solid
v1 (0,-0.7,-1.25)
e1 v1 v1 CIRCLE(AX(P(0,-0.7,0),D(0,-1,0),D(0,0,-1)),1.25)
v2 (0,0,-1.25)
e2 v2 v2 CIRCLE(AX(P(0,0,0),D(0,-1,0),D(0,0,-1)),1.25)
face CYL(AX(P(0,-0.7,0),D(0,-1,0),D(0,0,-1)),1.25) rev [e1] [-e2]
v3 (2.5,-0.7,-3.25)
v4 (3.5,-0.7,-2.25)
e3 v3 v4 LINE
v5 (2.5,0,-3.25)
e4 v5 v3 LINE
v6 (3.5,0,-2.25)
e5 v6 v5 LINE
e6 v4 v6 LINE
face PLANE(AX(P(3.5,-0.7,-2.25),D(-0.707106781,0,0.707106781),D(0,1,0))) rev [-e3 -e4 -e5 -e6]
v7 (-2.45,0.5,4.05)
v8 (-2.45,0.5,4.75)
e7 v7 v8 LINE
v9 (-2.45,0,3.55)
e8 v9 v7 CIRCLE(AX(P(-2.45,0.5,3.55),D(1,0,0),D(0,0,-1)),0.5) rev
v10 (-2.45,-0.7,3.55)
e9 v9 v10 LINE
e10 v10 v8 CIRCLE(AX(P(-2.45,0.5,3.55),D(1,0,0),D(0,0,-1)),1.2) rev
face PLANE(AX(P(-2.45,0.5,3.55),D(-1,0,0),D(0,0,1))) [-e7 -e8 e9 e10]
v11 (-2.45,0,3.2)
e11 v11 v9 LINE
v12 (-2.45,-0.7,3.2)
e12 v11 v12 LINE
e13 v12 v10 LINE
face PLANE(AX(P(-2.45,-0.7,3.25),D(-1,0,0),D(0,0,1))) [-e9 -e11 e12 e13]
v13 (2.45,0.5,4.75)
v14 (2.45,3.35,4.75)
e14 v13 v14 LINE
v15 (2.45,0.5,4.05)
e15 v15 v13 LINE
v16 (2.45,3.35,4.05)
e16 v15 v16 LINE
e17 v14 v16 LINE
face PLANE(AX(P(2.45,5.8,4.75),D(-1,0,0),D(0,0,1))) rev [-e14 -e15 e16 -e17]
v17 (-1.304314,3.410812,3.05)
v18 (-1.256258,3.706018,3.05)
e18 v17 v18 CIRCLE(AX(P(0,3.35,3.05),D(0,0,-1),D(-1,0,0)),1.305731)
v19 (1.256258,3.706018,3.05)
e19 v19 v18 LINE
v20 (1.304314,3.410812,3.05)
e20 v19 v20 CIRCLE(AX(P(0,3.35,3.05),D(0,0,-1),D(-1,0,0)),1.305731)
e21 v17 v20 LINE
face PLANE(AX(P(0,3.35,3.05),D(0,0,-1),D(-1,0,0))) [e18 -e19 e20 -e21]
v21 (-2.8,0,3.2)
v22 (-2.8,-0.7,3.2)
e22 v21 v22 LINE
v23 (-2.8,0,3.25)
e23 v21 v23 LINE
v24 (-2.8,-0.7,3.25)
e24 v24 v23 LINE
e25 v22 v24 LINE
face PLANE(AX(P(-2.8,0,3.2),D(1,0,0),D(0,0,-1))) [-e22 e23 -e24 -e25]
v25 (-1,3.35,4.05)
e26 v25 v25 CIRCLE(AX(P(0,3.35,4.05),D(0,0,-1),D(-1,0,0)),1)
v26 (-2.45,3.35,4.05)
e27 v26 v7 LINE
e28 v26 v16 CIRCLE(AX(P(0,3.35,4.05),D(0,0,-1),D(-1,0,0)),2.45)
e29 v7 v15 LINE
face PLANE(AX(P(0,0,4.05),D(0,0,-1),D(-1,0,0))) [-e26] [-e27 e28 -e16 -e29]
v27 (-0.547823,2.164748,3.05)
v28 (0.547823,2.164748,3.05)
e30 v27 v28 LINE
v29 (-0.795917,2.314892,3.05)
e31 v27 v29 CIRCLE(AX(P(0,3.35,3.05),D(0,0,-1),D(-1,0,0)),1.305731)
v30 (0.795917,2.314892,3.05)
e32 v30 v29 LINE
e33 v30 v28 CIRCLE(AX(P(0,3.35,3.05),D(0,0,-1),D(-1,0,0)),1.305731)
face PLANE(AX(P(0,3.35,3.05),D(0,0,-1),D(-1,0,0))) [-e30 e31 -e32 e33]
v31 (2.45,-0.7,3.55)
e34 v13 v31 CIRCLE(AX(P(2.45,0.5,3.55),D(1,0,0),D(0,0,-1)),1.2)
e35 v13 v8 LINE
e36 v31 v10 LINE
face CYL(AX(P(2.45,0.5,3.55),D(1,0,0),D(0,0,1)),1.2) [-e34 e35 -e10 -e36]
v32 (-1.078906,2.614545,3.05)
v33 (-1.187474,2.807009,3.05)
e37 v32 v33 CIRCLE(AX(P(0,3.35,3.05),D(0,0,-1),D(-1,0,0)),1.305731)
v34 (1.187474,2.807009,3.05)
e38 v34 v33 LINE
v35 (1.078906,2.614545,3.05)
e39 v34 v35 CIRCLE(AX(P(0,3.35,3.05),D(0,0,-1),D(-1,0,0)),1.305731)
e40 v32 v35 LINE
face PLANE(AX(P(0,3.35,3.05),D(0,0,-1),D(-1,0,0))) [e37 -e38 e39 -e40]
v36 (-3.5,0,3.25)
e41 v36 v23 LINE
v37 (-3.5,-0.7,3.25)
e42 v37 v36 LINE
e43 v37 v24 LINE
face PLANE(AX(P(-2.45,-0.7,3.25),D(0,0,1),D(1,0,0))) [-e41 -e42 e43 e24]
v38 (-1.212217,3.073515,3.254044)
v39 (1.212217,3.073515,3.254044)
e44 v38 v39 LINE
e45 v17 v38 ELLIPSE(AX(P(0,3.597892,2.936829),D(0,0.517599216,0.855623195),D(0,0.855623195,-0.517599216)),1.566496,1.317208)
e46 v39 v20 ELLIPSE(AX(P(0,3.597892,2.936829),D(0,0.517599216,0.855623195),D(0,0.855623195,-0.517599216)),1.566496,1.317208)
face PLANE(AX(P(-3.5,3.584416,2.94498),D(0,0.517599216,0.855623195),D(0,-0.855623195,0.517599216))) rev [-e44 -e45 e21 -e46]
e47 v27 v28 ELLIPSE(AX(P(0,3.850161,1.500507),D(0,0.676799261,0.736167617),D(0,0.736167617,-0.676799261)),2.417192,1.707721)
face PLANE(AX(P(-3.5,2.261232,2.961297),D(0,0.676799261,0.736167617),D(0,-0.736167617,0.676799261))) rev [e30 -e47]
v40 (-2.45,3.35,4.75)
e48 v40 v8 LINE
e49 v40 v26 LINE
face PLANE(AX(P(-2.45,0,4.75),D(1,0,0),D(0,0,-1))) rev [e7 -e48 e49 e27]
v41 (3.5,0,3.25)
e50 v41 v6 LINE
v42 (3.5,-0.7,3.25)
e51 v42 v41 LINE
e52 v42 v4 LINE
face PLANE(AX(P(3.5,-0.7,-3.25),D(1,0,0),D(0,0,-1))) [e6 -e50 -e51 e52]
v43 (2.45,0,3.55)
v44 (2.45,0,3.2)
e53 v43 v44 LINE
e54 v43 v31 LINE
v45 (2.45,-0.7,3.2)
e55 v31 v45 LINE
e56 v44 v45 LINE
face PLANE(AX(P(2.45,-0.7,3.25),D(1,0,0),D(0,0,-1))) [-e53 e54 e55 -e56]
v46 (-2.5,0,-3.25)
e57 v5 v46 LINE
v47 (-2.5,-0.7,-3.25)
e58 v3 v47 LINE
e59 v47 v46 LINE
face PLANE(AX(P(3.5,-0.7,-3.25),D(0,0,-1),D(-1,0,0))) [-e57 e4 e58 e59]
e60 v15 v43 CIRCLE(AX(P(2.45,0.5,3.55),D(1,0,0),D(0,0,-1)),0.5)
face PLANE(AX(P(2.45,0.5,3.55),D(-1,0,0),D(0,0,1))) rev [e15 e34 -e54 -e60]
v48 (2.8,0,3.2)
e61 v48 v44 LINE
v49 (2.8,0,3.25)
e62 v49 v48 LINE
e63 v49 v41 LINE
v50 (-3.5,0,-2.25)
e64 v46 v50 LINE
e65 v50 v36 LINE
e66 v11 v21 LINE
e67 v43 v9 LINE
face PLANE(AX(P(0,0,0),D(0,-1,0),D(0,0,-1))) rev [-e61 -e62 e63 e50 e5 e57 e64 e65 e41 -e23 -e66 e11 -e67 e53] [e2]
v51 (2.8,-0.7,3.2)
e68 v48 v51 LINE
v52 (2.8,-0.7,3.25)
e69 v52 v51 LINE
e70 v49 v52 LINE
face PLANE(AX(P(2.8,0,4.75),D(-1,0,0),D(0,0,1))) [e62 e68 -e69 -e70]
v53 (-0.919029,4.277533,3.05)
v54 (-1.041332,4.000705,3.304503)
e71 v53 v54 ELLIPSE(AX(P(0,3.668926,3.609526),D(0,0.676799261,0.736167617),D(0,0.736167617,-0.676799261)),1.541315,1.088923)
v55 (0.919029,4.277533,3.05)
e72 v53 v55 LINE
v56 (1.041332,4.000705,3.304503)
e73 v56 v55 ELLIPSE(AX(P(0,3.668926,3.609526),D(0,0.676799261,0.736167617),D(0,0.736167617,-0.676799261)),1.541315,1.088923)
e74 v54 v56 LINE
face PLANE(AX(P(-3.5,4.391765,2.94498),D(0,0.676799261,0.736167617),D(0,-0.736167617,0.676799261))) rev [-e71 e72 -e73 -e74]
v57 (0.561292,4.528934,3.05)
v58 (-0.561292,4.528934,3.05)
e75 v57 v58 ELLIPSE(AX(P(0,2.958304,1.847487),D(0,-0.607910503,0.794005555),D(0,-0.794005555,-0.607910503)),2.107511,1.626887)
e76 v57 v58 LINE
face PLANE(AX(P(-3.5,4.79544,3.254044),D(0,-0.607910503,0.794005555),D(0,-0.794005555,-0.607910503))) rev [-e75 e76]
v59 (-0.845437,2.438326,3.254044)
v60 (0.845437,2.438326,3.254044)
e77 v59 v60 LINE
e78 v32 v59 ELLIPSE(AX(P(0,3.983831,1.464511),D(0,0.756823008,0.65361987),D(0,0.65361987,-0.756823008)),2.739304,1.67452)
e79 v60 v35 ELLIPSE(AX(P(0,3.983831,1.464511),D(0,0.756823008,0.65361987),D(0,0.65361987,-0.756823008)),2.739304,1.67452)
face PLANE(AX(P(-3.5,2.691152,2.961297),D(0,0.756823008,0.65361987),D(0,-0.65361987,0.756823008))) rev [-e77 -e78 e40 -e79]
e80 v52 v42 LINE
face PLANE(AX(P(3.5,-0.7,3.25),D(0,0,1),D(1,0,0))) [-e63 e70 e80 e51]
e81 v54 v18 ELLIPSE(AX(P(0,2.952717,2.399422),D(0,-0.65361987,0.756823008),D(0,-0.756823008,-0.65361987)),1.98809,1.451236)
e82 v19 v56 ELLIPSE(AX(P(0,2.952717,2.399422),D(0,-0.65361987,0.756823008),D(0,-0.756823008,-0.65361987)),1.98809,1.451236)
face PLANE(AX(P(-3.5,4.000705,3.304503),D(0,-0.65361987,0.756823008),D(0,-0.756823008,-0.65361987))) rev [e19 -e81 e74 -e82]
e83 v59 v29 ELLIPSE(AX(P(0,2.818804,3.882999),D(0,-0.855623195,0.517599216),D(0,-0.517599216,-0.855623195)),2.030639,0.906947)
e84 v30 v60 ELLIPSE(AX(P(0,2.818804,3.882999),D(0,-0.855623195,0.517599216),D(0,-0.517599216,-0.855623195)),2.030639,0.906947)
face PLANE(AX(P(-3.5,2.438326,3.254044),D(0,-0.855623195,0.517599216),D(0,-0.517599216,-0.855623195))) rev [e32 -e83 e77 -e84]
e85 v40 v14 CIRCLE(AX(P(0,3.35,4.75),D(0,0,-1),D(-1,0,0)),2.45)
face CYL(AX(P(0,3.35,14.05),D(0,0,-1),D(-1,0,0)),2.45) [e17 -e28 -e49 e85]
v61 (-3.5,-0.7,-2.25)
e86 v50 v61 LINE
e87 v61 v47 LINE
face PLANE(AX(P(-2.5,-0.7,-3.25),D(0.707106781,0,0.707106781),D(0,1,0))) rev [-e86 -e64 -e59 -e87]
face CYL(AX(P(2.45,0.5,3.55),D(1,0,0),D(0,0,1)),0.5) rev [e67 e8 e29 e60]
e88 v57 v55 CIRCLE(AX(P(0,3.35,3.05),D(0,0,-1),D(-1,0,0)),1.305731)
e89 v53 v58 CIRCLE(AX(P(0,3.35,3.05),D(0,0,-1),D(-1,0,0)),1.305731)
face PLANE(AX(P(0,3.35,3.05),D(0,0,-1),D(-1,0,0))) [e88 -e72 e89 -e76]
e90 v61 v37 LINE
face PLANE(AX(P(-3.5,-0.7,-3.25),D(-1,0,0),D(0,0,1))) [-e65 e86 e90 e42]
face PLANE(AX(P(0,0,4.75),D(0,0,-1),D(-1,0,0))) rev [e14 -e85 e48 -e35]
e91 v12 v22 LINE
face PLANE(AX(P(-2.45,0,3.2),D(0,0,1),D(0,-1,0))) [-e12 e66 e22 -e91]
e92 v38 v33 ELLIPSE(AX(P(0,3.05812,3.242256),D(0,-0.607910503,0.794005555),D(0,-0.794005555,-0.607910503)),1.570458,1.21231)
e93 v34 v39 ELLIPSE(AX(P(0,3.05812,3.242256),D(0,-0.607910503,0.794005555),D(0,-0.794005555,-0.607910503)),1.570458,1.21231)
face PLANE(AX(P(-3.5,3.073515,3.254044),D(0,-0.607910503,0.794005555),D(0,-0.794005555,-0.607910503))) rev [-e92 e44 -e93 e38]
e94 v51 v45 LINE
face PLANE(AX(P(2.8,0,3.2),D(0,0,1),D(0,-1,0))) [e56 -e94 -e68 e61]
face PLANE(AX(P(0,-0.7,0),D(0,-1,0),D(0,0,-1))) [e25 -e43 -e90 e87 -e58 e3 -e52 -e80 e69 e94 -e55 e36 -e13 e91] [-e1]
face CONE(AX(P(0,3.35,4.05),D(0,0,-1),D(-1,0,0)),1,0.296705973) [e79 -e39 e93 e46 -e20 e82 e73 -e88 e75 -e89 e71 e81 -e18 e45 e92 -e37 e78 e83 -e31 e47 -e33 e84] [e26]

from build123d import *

# Parameters (mm, degrees)
BASE_FLANGE1_DEPTH       = 0.7
EDGE_FLANGE1_START       = -2.45
EDGE_FLANGE1_DEPTH       = 4.9
EDGE_FLANGE1_START_2     = -2.8
EDGE_FLANGE1_2_OUTLINE_W = 0.7
EDGE_FLANGE1_2_OUTLINE_H = 0.05
EDGE_FLANGE1_2_DEPTH     = 0.35
EDGE_FLANGE1_START_3     = 2.45
EDGE_FLANGE1_3_OUTLINE_W = 0.7
EDGE_FLANGE1_3_OUTLINE_H = 0.05
EDGE_FLANGE1_3_DEPTH     = 0.35
EDGE_FLANGE1_4_DEPTH     = 4.9
CUT_EXTRUDE1_DEPTH       = 10
SKETCH10_R               = 1
BOSS_EXTRUDE1_DEPTH      = 1
BOSS_EXTRUDE1_DRAFT      = -17
CUT_EXTRUDE2_DEPTH       = 10.571050099
CHAMFER1_SIZE            = 1
M3_TAPPED_HOLE1_D        = 2.5
M3_TAPPED_HOLE1_DEPTH    = 7.5
M3_TAPPED_HOLE1_TIP      = 0.751075774


# Read off the part's stored shape, not the designer's step: Edge-Flange1
# Sheet-metal steps are written as plain solids
with BuildPart() as part:
    # Sketch1 → Base-Flange1 (new body)
    with BuildSketch(Plane(origin=(0, 0, 0), x_dir=(1, 0, 0), z_dir=(0, 1, 0))):
        Polygon((-2.45, -3.25), (-3.5, -3.25), (-3.5, 3.25), (3.5, 3.25), (3.5, -3.25), (2.45, -3.25), (2.45, -4.75), (-2.45, -4.75), align=None)
    extrude(amount=-BASE_FLANGE1_DEPTH)

    # Edge-Flange1 outline → Edge-Flange1 (cut)
    with BuildSketch(Plane.YZ.offset(EDGE_FLANGE1_START)):
        with BuildLine():
            Line((-0.7, 4.75), (-0.7, 3.55))
            ThreePointArc((-0.7, 3.55), (-0.509950493, 4.198074069), (0, 4.640871211))
            Line((0, 4.640871211), (0, 4.75))
            Line((0, 4.75), (-0.7, 4.75))
        make_face()
    extrude(amount=EDGE_FLANGE1_DEPTH, mode=Mode.SUBTRACT)

    # Edge-Flange1 2 outline → Edge-Flange1 2 (cut)
    with BuildSketch(Plane.YZ.offset(EDGE_FLANGE1_START_2)):
        with Locations((-0.35, 3.225)):
            Rectangle(EDGE_FLANGE1_2_OUTLINE_W, EDGE_FLANGE1_2_OUTLINE_H)
    extrude(amount=EDGE_FLANGE1_2_DEPTH, mode=Mode.SUBTRACT)

    # Edge-Flange1 3 outline → Edge-Flange1 3 (cut)
    with BuildSketch(Plane.YZ.offset(EDGE_FLANGE1_START_3)):
        with Locations((-0.35, 3.225)):
            Rectangle(EDGE_FLANGE1_3_OUTLINE_W, EDGE_FLANGE1_3_OUTLINE_H)
    extrude(amount=EDGE_FLANGE1_3_DEPTH, mode=Mode.SUBTRACT)

    # Edge-Flange1 4 outline → Edge-Flange1 4 (add)
    with BuildSketch(Plane.YZ.offset(EDGE_FLANGE1_START)):
        with BuildLine():
            Line((0, 4.640871211), (0, 3.55))
            ThreePointArc((0, 3.55), (0.146446609, 3.903553391), (0.5, 4.05))
            Line((0.5, 4.05), (5.8, 4.05))
            Line((5.8, 4.05), (5.8, 4.75))
            Line((5.8, 4.75), (0.5, 4.75))
            ThreePointArc((0.5, 4.75), (0.244114727, 4.722400412), (0, 4.640871211))
        make_face()
    extrude(amount=EDGE_FLANGE1_4_DEPTH)

    # Sketch9 → Cut-Extrude1 (cut)
    with BuildSketch(Plane(origin=(0, 0, 4.05), x_dir=(-1, 0, 0), z_dir=(0, 0, -1))):
        with BuildLine():
            ThreePointArc((0, 5.8), (1.732411614, 5.082411614), (2.45, 3.35))
            Line((2.45, 3.35), (2.45, 5.8))
            Line((2.45, 5.8), (0, 5.8))
        make_face()
        with BuildLine():
            ThreePointArc((-2.45, 3.35), (-1.732411614, 5.082411614), (0, 5.8))
            Line((0, 5.8), (-2.45, 5.8))
            Line((-2.45, 5.8), (-2.45, 3.35))
        make_face()
    extrude(amount=-CUT_EXTRUDE1_DEPTH, mode=Mode.SUBTRACT)


with BuildPart() as boss_extrude1_tool:
    # Sketch10 → Boss-Extrude1 (with draft: the straight prism first)
    with BuildSketch(Plane(origin=(0, 0, 4.05), x_dir=(-1, 0, 0), z_dir=(0, 0, -1))):
        with Locations((0, 3.35)):
            Circle(SKETCH10_R)
    extrude(amount=BOSS_EXTRUDE1_DEPTH)
    # Boss-Extrude1: the draft: its side faces are tilted about the plane it starts from
    boss_extrude1_sides = [boss_extrude1_tool.faces().sort_by_distance(p)[0] for p in [
        (1, 3.35, 3.55),
    ]]
    draft(boss_extrude1_sides, Plane(origin=(0, 0, 4.05), x_dir=(-1, 0, 0), z_dir=(0, 0, -1)), BOSS_EXTRUDE1_DRAFT)


with BuildPart() as part_1:
    add(part.part)

    # Boss-Extrude1: add boss_extrude1_tool
    add(boss_extrude1_tool.part)

    # Sketch11 → Cut-Extrude2 (cut, through all)
    with BuildSketch(Plane(origin=(2.45, 0, 0), x_dir=(0, 0, -1), z_dir=(1, 0, 0))):
        Polygon((-3.254043784, 4.795439766), (-2.944980446, 4.391765202), (-3.304503105, 4.000705467), (-2.944980446, 3.584416072), (-3.254043784, 3.073515451), (-2.961297011, 2.691152319), (-3.254043784, 2.43832556), (-2.961297011, 2.261231833), (-3.304503105, 1.887919941), (-2.402542749, 1.887919941), (-2.522383636, 4.908973238), align=None)
    extrude(amount=-CUT_EXTRUDE2_DEPTH, mode=Mode.SUBTRACT)

    # Chamfer1
    chamfer1_edges = [part_1.edges().sort_by_distance(p)[0] for p in [
        (-3.5, -0.35, -3.25),
        (3.5, -0.35, -3.25),
    ]]
    chamfer(chamfer1_edges, length=CHAMFER1_SIZE)

    # M3 Tapped Hole1
    with Locations(Plane(origin=(0, -0.7, 0), x_dir=(-1, 0, 0), z_dir=(0, -1, 0))):
        with Locations((0, 0)):
            Hole(M3_TAPPED_HOLE1_D / 2, depth=M3_TAPPED_HOLE1_DEPTH)
            with Locations((0, 0, -(M3_TAPPED_HOLE1_DEPTH + M3_TAPPED_HOLE1_TIP / 2))):  # 118° drill point
                Cone(0, M3_TAPPED_HOLE1_D / 2, M3_TAPPED_HOLE1_TIP, mode=Mode.SUBTRACT)


solid = part_1.part
